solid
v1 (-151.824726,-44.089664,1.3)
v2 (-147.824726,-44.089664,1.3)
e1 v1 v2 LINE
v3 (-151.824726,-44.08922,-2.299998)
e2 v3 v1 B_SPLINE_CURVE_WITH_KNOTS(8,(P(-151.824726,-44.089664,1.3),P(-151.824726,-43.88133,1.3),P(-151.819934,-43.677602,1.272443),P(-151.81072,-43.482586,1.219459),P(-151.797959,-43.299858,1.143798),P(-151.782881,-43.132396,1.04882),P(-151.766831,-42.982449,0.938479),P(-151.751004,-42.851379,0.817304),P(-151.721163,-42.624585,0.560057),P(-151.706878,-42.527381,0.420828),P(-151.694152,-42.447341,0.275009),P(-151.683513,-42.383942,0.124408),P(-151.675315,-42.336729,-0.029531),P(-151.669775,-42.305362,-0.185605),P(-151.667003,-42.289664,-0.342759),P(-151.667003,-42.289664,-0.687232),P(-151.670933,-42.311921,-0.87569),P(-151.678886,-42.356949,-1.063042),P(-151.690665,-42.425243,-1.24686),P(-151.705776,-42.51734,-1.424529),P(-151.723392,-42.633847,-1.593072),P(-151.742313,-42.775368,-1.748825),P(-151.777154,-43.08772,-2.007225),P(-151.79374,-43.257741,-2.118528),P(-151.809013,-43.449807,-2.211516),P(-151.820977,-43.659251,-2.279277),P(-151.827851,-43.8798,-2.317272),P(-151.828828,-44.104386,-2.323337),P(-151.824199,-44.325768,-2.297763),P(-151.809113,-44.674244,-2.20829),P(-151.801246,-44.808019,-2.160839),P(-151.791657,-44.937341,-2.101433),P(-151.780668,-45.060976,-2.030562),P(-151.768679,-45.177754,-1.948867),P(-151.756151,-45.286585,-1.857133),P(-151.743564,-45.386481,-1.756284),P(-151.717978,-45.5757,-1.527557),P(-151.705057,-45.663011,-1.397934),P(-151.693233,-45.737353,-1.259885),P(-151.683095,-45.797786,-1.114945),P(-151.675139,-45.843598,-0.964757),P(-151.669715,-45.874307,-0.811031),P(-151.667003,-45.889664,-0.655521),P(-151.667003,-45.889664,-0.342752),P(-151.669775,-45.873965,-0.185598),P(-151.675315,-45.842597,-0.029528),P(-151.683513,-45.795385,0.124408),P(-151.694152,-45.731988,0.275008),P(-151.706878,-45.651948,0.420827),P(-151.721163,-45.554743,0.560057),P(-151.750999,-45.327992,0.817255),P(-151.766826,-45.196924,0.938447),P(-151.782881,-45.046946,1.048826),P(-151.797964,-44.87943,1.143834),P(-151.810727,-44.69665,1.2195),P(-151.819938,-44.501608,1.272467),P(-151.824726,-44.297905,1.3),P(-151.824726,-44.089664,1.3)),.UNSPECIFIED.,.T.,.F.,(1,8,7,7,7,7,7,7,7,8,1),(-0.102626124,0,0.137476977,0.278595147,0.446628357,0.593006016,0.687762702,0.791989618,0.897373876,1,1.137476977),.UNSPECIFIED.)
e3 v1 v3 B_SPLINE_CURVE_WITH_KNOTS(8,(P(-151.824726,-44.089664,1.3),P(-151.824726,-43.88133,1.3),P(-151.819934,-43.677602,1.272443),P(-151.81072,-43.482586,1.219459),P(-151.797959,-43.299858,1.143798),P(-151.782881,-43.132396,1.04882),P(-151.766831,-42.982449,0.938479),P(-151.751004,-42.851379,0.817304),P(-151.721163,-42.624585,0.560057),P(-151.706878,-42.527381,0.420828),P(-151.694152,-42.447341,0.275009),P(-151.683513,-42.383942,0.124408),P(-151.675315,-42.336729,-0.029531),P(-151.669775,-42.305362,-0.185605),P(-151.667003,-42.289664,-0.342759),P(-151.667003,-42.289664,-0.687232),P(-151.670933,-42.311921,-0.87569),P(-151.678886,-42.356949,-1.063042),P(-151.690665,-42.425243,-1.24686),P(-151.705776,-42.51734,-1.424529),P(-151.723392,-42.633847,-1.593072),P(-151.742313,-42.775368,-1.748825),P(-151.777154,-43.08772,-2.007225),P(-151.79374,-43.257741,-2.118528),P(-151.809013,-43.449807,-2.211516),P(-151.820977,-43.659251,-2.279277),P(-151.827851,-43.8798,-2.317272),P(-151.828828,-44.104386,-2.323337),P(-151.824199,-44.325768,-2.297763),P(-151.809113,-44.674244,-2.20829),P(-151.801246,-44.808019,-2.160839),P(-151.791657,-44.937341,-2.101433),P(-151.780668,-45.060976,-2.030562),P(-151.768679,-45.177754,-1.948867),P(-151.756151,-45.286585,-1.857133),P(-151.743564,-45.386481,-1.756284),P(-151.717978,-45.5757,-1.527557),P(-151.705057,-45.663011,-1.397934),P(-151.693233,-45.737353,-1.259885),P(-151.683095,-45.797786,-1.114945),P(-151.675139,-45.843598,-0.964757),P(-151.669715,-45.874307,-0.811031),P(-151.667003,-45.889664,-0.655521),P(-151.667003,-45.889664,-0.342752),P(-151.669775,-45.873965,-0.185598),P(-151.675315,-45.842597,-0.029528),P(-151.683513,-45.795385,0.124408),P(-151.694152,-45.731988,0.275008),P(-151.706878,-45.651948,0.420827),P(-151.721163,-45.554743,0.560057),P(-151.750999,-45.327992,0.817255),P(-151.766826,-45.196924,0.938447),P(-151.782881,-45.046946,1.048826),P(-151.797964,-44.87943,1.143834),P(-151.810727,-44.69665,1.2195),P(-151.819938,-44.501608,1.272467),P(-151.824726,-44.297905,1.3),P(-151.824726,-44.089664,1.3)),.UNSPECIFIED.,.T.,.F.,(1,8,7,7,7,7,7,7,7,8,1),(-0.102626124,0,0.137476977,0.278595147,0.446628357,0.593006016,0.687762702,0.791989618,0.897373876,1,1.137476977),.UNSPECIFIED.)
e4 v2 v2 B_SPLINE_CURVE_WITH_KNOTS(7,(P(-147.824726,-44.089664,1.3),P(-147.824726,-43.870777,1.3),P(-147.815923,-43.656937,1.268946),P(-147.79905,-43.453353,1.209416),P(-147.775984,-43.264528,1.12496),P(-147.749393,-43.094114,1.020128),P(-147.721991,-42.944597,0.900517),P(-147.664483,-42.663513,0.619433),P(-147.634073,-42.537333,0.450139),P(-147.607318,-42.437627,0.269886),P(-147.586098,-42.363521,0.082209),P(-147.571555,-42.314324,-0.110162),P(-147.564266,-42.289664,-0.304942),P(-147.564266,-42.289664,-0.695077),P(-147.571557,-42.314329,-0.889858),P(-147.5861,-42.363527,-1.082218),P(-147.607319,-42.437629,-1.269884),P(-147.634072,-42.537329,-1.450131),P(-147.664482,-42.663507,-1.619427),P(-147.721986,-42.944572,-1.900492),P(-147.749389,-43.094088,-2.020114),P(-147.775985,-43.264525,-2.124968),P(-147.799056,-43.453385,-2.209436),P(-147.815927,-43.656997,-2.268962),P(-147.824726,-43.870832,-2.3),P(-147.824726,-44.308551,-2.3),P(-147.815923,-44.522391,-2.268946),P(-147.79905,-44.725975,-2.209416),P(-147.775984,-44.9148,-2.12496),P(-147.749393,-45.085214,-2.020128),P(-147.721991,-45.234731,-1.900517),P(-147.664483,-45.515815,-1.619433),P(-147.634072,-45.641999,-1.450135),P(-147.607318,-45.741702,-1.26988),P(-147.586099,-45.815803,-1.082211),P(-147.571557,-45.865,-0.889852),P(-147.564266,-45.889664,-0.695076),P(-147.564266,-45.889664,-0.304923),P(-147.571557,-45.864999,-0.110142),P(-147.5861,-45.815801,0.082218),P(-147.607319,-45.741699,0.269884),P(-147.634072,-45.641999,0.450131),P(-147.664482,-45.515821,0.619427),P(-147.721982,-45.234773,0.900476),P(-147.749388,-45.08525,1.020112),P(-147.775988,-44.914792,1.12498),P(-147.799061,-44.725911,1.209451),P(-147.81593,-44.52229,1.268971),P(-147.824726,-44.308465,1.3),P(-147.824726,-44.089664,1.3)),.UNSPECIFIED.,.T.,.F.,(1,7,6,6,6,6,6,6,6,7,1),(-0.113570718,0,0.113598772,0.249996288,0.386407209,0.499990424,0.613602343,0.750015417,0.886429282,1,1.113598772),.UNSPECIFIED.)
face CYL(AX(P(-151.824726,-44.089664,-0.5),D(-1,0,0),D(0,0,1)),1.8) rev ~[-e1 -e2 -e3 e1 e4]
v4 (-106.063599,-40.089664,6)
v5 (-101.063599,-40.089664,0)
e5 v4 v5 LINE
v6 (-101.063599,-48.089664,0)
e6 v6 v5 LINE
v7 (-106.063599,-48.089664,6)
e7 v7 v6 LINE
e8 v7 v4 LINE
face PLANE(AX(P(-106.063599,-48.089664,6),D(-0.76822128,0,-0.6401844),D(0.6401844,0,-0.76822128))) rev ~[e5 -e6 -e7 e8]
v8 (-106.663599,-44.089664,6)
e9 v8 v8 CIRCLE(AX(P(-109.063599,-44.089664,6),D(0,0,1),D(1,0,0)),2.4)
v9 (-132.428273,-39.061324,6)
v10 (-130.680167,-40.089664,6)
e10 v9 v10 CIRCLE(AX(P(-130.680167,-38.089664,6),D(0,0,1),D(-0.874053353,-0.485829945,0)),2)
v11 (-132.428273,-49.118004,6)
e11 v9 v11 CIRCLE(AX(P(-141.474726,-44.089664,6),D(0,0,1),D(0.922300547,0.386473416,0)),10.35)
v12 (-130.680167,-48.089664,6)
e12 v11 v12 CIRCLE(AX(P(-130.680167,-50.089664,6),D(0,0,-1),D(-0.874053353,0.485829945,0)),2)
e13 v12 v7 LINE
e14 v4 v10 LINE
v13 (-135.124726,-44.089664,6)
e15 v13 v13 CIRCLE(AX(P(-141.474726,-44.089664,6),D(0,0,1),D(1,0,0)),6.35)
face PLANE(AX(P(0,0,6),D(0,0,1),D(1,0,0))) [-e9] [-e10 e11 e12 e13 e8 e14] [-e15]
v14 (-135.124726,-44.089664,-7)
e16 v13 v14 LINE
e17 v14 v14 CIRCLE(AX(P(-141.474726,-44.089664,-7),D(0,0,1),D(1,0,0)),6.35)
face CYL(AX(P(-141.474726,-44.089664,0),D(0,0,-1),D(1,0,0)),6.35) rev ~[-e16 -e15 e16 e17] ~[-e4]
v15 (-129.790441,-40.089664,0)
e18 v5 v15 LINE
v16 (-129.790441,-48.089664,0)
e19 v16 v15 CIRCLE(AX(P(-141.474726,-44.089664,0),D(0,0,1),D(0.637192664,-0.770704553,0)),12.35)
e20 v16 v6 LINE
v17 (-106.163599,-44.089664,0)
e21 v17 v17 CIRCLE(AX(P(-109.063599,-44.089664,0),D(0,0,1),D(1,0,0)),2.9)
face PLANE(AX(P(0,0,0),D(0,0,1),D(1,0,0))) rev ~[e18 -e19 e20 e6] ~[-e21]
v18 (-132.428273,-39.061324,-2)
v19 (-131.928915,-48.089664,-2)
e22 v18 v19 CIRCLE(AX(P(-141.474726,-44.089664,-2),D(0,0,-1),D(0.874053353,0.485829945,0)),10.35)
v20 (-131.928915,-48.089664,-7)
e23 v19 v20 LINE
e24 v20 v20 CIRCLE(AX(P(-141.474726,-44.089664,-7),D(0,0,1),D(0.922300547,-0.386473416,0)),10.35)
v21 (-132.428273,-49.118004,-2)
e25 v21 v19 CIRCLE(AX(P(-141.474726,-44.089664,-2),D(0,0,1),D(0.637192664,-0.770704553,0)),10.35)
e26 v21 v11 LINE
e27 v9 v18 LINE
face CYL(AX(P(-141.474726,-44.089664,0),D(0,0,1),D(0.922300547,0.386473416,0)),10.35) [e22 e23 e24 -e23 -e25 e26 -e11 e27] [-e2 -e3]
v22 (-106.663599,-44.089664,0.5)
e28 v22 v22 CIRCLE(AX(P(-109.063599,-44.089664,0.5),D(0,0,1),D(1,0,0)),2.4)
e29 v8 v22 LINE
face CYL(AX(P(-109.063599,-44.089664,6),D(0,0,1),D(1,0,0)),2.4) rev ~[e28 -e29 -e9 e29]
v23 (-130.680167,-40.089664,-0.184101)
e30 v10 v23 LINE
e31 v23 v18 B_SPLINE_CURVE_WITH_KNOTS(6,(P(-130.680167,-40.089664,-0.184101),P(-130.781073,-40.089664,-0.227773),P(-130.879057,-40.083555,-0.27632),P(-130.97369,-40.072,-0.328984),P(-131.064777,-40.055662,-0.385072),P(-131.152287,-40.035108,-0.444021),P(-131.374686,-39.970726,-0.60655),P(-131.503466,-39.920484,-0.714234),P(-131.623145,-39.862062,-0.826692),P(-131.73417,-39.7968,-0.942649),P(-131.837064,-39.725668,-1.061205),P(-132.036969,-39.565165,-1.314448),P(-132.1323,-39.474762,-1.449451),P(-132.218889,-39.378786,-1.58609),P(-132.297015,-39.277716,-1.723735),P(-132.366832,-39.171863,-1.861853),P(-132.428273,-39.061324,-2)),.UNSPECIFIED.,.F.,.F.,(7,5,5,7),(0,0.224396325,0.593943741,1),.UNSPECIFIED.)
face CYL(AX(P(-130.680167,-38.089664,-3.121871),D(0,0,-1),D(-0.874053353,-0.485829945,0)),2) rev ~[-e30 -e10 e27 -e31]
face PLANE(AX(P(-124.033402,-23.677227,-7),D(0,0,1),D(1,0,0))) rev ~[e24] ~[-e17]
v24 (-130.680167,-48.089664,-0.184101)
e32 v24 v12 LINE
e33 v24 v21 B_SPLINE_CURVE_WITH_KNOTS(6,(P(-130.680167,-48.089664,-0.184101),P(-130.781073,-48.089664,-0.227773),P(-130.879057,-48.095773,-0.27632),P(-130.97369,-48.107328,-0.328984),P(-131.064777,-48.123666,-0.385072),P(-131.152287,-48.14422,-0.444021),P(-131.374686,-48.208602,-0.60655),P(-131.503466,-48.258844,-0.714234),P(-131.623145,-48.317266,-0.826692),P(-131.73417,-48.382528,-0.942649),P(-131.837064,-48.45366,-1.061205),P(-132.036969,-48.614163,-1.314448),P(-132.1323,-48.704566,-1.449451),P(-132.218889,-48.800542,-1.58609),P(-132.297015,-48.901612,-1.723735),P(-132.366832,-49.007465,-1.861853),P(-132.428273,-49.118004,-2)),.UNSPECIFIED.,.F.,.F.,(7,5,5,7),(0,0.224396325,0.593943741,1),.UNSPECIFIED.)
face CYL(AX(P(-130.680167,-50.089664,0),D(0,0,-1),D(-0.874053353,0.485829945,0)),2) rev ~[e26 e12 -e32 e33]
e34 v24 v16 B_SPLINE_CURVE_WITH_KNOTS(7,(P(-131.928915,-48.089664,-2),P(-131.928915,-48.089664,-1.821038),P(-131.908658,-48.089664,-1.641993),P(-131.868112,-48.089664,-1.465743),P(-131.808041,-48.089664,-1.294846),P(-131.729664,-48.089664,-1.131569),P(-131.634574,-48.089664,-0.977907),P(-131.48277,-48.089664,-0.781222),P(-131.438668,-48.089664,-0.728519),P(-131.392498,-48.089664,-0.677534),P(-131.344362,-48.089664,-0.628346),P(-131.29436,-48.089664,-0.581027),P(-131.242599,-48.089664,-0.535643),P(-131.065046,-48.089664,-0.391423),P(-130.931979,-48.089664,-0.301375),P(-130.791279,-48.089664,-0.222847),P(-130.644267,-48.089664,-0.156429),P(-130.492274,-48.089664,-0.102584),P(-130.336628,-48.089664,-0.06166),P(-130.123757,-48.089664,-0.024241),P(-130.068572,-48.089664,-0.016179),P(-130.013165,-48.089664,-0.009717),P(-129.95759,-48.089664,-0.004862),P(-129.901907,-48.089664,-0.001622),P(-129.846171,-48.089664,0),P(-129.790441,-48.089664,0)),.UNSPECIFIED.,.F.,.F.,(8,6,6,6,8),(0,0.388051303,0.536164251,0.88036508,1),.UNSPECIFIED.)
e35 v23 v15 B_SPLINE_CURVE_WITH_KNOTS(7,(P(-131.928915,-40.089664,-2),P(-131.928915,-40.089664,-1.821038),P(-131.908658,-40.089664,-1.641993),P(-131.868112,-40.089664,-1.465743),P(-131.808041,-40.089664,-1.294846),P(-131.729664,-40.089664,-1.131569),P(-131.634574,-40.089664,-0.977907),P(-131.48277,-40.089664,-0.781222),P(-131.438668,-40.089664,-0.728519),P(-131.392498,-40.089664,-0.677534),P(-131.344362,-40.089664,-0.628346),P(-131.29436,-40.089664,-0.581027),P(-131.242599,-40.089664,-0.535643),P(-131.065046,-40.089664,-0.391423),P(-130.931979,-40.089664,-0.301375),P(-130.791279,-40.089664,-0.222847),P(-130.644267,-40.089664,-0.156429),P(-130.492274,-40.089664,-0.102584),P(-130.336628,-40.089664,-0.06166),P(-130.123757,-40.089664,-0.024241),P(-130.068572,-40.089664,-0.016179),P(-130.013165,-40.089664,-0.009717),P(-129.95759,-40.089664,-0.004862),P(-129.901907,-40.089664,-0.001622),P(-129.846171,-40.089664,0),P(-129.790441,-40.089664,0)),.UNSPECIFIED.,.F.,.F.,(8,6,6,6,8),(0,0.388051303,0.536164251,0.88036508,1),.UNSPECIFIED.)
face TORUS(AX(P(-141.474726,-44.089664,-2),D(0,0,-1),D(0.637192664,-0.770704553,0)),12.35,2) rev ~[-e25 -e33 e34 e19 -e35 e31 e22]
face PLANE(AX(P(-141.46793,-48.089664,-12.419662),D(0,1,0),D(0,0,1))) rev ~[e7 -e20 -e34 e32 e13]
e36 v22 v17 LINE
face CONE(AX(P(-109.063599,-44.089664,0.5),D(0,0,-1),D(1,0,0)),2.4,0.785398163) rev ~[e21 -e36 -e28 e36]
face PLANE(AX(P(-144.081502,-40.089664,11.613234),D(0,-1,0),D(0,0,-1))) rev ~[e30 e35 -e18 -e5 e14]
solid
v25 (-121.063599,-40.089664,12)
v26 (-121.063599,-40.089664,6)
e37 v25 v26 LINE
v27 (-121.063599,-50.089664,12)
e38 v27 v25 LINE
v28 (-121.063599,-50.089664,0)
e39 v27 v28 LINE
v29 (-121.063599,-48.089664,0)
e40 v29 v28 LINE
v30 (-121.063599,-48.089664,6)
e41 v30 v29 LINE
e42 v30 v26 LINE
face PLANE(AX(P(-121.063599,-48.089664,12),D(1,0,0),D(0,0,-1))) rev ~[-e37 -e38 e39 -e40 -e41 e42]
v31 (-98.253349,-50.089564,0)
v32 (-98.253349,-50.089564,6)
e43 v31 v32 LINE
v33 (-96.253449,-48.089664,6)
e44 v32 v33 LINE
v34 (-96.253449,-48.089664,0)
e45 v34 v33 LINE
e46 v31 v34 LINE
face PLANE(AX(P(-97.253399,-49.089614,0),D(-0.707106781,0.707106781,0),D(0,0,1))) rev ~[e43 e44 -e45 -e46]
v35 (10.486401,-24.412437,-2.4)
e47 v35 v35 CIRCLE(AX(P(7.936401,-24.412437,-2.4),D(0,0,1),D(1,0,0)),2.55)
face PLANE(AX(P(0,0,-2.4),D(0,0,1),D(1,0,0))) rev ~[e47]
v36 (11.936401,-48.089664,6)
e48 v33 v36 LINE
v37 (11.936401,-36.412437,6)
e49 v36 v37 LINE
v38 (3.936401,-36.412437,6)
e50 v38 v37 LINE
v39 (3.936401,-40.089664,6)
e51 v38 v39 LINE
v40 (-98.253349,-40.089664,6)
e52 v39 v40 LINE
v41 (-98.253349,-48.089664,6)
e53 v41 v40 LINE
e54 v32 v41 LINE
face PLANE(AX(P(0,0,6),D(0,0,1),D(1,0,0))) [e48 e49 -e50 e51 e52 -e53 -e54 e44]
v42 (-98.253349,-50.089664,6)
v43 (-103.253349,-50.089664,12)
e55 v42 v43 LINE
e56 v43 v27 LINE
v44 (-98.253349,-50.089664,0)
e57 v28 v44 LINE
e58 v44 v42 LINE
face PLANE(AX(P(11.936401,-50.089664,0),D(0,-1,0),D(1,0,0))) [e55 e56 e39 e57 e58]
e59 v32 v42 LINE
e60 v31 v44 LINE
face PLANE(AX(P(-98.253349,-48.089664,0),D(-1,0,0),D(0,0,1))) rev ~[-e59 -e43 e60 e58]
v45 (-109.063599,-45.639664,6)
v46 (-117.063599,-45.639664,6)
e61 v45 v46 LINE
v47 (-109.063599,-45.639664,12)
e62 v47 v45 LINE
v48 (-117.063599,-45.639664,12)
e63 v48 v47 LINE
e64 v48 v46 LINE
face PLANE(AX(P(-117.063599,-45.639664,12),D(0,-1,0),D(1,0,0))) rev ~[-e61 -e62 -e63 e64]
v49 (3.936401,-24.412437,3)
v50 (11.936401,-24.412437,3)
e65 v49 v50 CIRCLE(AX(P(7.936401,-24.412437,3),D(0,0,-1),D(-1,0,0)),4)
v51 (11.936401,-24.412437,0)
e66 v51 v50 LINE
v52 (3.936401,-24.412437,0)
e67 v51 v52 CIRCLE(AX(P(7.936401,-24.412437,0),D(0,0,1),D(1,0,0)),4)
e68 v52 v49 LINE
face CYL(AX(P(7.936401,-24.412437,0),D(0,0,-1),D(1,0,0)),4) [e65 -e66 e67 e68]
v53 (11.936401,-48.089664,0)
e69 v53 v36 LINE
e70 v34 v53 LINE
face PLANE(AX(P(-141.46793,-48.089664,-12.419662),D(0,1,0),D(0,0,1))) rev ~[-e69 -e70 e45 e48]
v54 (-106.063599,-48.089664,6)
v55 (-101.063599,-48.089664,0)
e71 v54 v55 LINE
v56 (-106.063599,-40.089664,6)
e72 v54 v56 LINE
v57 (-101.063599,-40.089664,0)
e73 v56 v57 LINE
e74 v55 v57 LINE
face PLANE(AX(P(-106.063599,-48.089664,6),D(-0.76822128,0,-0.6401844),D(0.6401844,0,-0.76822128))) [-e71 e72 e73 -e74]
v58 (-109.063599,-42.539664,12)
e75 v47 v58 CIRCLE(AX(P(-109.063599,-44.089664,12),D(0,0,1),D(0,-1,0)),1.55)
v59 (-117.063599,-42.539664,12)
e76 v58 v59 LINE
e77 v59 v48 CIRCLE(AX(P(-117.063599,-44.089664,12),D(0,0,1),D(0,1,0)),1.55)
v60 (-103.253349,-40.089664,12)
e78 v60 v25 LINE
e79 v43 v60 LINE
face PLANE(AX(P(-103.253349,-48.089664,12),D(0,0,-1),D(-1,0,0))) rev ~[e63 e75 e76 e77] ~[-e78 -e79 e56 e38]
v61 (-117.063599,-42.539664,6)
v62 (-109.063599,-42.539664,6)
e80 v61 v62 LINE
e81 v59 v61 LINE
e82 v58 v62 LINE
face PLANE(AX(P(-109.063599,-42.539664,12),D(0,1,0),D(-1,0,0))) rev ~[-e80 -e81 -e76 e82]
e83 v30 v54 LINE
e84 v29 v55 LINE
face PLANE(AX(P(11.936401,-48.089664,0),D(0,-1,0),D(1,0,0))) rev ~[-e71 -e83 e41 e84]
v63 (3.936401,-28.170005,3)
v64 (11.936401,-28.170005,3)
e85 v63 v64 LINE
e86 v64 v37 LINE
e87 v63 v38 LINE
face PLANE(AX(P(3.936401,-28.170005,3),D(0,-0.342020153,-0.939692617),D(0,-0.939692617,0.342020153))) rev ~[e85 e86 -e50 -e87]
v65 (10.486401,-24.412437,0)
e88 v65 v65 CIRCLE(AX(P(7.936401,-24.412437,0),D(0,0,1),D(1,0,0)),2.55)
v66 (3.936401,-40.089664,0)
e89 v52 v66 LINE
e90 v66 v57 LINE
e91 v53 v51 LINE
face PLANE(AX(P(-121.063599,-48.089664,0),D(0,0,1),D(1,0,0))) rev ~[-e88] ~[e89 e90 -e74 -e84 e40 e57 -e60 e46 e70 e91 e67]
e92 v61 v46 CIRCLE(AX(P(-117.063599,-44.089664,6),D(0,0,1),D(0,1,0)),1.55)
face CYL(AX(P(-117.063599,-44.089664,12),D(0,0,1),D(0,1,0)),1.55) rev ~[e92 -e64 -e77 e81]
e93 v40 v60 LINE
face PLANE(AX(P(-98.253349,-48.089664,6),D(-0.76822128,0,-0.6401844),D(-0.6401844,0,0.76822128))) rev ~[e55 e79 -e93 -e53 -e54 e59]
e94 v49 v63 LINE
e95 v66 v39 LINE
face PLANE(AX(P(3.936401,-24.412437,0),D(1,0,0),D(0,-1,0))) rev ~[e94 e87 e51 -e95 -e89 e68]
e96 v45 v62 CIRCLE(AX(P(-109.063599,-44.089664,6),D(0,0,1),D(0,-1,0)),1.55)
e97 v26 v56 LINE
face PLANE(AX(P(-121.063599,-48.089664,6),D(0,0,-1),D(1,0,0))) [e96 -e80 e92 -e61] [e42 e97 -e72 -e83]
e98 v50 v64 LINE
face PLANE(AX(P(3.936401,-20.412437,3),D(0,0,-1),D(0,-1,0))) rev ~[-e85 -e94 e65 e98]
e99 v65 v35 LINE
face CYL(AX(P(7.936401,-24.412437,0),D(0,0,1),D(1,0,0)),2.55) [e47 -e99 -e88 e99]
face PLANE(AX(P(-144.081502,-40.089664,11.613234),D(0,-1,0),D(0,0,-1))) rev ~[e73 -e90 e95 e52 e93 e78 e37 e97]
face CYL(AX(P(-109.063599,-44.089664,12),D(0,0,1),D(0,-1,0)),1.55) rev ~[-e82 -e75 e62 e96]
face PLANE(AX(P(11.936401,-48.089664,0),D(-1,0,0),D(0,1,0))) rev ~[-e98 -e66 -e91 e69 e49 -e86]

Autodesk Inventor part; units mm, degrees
ref_plane "YZ Plane" through (0, 0, 0) normal (1, 0, 0) x (0, 1, 0)
sketch "Sketch1" plane through (0, 0, 0) normal (0, 0, 1) x (1, 0, 0)
  circle A0 centre (7.936401, -24.412437) radius 2.575 construction
  circle A1 centre (7.936401, -24.412437) radius 2.55
  dimension "d70" = 5.1
sketch "Sketch1 outline for Extrusion1" plane through (0, 0, 0) normal (0, 0, 1) x (1, 0, 0)
  circle A0 centre (7.936401, -24.412437) radius 2.55
extrude "Extrusion1" add sketch "Sketch1 outline for Extrusion1" against normal blind 2.4
sketch "Sketch2" plane through (0, 0, 0) normal (0, 0, 1) x (1, 0, 0)
  arc A0 (11.936401, -24.412437) -> (3.936401, -24.412437) centre (7.936401, -24.412437) ccw
  line L0 (11.936401, -24.412437) -> (3.936401, -24.412437) construction
  line L1 (3.936401, -24.412437) -> (3.936401, -40.089664)
  line L2 (11.936401, -48.089664) -> (11.936401, -24.412437)
  line L3 (-141.474726, -48.126865) -> (-141.474726, -40.126865) construction
  line L4 (-131.928915, -40.089664) -> (3.936401, -40.089664)
  arc A1 (-131.928915, -40.089664) -> (-131.928915, -48.089664) centre (-141.474726, -44.089664) ccw
  line L5 (11.936401, -48.089664) -> (-131.928915, -48.089664)
  circle A2 centre (-141.474726, -44.089664) radius 6.35
  line L6 (-118.52781, -40.089664) -> (-118.52781, -48.089664) construction
  circle A3 centre (-141.474726, -44.089664) radius 5.8293
  circle A4 centre (7.936401, -24.412437) radius 2.55
  point P0 (-118.52781, -44.089664)
  point P1 (12.740451, -19.012437)
  dimension "d3" = 8
  dimension "d36" = 12.7
  dimension "d37" = 4
  dimension "d38" = 8
sketch "Sketch2 outline for Extrusion2" plane through (0, 0, 0) normal (0, 0, 1) x (1, 0, 0)
  line L0 (11.936401, -48.089664) -> (11.936401, -24.412437)
  line L1 (-131.928915, -48.089664) -> (11.936401, -48.089664)
  arc A0 (11.936401, -24.412437) -> (3.936401, -24.412437) centre (7.936401, -24.412437) ccw
  arc A1 (-131.928915, -40.089664) -> (-131.928915, -48.089664) centre (-141.474726, -44.089664) ccw
  line L2 (3.936401, -24.412437) -> (3.936401, -40.089664)
  line L3 (3.936401, -40.089664) -> (-131.928915, -40.089664)
  circle A2 centre (-141.474726, -44.089664) radius 6.35
extrude "Extrusion2" add sketch "Sketch2 outline for Extrusion2" along normal blind 6
sketch "Sketch3" plane through (3.936401, -40.089664, 0) normal (-1, 0, 0) x (0, 0, 1)
  line L0 (0, 19.677227) -> (6, 19.677227)
  line L1 (3, 19.677227) -> (3, 11.919659)
  line L2 (3, 11.919659) -> (6, 3.677227)
  line L3 (6, 15.677227) -> (6, 19.677227)
  line L4 (6, 15.677227) -> (6, 0)
  point P0 (0, 40.089664)
  point P1 (5, 8)
  dimension "d8" = 160
  dimension "d10" = 16
sketch "Sketch3 outline for Extrusion3" plane through (3.936401, -40.089664, 0) normal (-1, 0, 0) x (0, 0, 1)
  line L0 (6, 15.677227) -> (6, 19.677227)
  line L1 (6, 3.677227) -> (6, 15.677227)
  line L2 (3, 11.919659) -> (6, 3.677227)
  line L3 (3, 19.677227) -> (3, 11.919659)
  line L4 (6, 19.677227) -> (3, 19.677227)
extrude "Extrusion3" cut sketch "Sketch3 outline for Extrusion3" against normal through all
ref_plane "Work Plane3" through (-155.900182, -65.296024, -7) normal (0, 0, 1) x (1, 0, 0)
sketch "Sketch8" plane through (-124.033402, -23.677227, 0) normal (0, 0, 1) x (1, 0, 0)
  arc A0 (-7.895513, -16.412437) -> (-7.895513, -24.412437) centre (-17.441324, -20.412437) ccw
  circle A1 centre (-17.441324, -20.412437) radius 6.35
  circle A2 centre (-17.441324, -20.412437) radius 10.35
  point P0 (124.033402, 23.677227)
  point P1 (-7.895513, -24.412437)
  point P2 (-7.895513, -16.412437)
sketch "Sketch8 outline for Extrusion8" plane through (-124.033402, -23.677227, 0) normal (0, 0, 1) x (1, 0, 0)
  arc A0 (-7.895513, -24.412437) -> (-7.895513, -16.412437) centre (-17.441324, -20.412437) ccw
  arc A1 (-7.895513, -16.412437) -> (-7.895513, -24.412437) centre (-17.441324, -20.412437) ccw
  circle A2 centre (-17.441324, -20.412437) radius 6.35
extrude "Extrusion8" add sketch "Sketch8 outline for Extrusion8" against normal up to surface (7 mm away)
fillet "Fillet1" radius 2 3 edges at (-131.1247, -44.0897, 0) (-131.9289, -48.0897, 3) (-131.9289, -40.0897, 3)
ref_plane "Work Plane2" through (-151.824726, -44.089664, 0) normal (-1, 0, 0) x (0, 0, 1)
sketch "Sketch9" plane through (-151.824726, -44.089664, 0) normal (-1, 0, 0) x (0, 0, 1)
  circle A0 centre (-0.5, 0) radius 1.8
  line L0 (6, -10.35) -> (6, 10.35) projected
  point P0 (0, 44.089664)
  point P1 (6, 5.02834)
  point P2 (6, -5.02834)
  point P3 (6, 0)
  dimension "d31" = 3.6
  dimension "d41" = 6.5
sketch "Sketch9 outline for Extrusion9" plane through (-151.824726, -44.089664, 0) normal (-1, 0, 0) x (0, 0, 1)
  circle A0 centre (-0.5, 0) radius 1.8
extrude "Extrusion9" cut sketch "Sketch9 outline for Extrusion9" against normal up to next
sketch "Sketch10" plane through (11.936401, -48.089664, 0) normal (0, -1, 0) x (1, 0, 0)
  line L0 (-8, 6) -> (-142.616568, 6)
  line L1 (-118, 6) -> (-113, 0)
  line L2 (-8, 0) -> (-141.726842, 0)
  point P0 (-11.936401, 0)
  point P1 (-142.616879, 0)
  point P2 (-143.760295, 0)
surface extrude "ExtrusionSrf1" sketch "Sketch10" against normal through all shown no curves L1
split body "Split1" result two bodies by surface "ExtrusionSrf1" first body at (-134.013926, -50.520758, -1)
sketch "Sketch11" plane through (11.936401, -48.089664, 0) normal (0, -1, 0) x (1, 0, 0)
  line L0 (-8, 6) -> (-118, 6)
  line L1 (-110.18975, 6) -> (-115.18975, 12)
  line L2 (-110.18975, 6) -> (-102.379501, 6) construction
  line L3 (-115.18975, 12) -> (-133, 12)
  line L4 (-133, 12) -> (-133, 6)
  line L5 (-142.616568, 6) -> (-118, 6)
  line L6 (-133, 6) -> (-118, 6)
  line L7 (-118, 6) -> (-113, 0)
  line L8 (-118, 6) -> (-110.18975, 6)
  line L9 (-113, 0) -> (-141.726842, 0)
  line L10 (-113, 0) -> (0, 0)
  point P0 (-11.936401, 0)
  point P1 (-142.616879, 0)
  point P2 (-143.760295, 0)
  dimension "d47" = 6
  dimension "d48" = 6
  dimension "d49" = 15
  dimension "d64" = 6
sketch "Sketch11 outline for Extrusion10" plane through (11.936401, -48.089664, 0) normal (0, -1, 0) x (1, 0, 0)
  line L0 (-115.18975, 12) -> (-133, 12)
  line L1 (-110.18975, 6) -> (-115.18975, 12)
  line L2 (-118, 6) -> (-110.18975, 6)
  line L3 (-133, 6) -> (-118, 6)
  line L4 (-133, 12) -> (-133, 6)
extrude "Extrusion10" add sketch "Sketch11 outline for Extrusion10" against normal up to surface (8 mm away) bodies 3
sketch "Sketch12" plane through (-121.063599, -48.089664, 12) normal (0, 0, 1) x (1, 0, 0)
  line L0 (4, 4) -> (12, 4) construction
  line L1 (4, 2.45) -> (12, 2.45)
  line L2 (12, 5.55) -> (4, 5.55)
  arc A0 (4, 5.55) -> (4, 2.45) centre (4, 4) ccw
  arc A1 (12, 2.45) -> (12, 5.55) centre (12, 4) ccw
  line L3 (0, 0) -> (0, 8)
  line L4 (17.81025, 0) -> (17.81025, 8)
  point P0 (121.063599, 48.089664)
  point P1 (8, 4)
  point P2 (0, 4)
  dimension "d52" = 8
  dimension "d53" = 3.1
  dimension "d54" = 4
sketch "Sketch12 outline for Extrusion11" plane through (-121.063599, -48.089664, 12) normal (0, 0, 1) x (1, 0, 0)
  line L0 (4, 2.45) -> (12, 2.45)
  arc A0 (4, 5.55) -> (4, 2.45) centre (4, 4) ccw
  line L1 (12, 5.55) -> (4, 5.55)
  arc A1 (12, 2.45) -> (12, 5.55) centre (12, 4) ccw
extrude "Extrusion11" cut sketch "Sketch12 outline for Extrusion11" against normal through all bodies 3
sketch "Sketch13" plane through (0, 0, 6) normal (0, 0, 1) x (1, 0, 0)
  arc A0 (-109.063599, -45.639664) -> (-109.063599, -42.539664) centre (-109.063599, -44.089664) ccw
  circle A1 centre (-109.063599, -44.089664) radius 2.4
  point P0 (0, 0)
  dimension "d58" = 4.8
sketch "Sketch13 outline for Extrusion12" plane through (0, 0, 6) normal (0, 0, 1) x (1, 0, 0)
  circle A0 centre (-109.063599, -44.089664) radius 2.4
extrude "Extrusion12" cut sketch "Sketch13 outline for Extrusion12" against normal through all bodies 2
chamfer "Chamfer1" distance 0.5 angle 45 1 edges at (-111.4636, -44.0897, 0)
sketch "Sketch14" plane through (11.936401, -48.089664, 0) normal (0, -1, 0) x (1, 0, 0)
  line L0 (-115.18975, 12) -> (-133, 12)
  line L1 (-133, 12) -> (-115.18975, 12)
  line L2 (-133, 0) -> (-133, 12)
  line L3 (-110.18975, 6) -> (-115.18975, 12)
  line L4 (-115.18975, 12) -> (-110.18975, 6)
  line L5 (-110.18975, 0) -> (-110.18975, 6)
  line L6 (-141.726842, 0) -> (-113, 0)
  line L7 (-133, 0) -> (-110.18975, 0)
  point P0 (-11.936401, 0)
  point P1 (-142.616879, 0)
  point P2 (-143.760295, 0)
sketch "Sketch14 outline for Extrusion13" plane through (11.936401, -48.089664, 0) normal (0, -1, 0) x (1, 0, 0)
  line L0 (-110.18975, 0) -> (-110.18975, 6)
  line L1 (-133, 0) -> (-110.18975, 0)
  line L2 (-133, 12) -> (-133, 0)
  line L3 (-115.18975, 12) -> (-133, 12)
  line L4 (-110.18975, 6) -> (-115.18975, 12)
extrude "Extrusion13" add sketch "Sketch14 outline for Extrusion13" along normal blind 2 bodies 3
chamfer "Chamfer2" distance 2 angle 45 1 edges at (-98.2533, -48.0897, 3)
equation "\"d47\" = d64"
equation "\"d48\" = d47"
properties part number "head_lock_2"
